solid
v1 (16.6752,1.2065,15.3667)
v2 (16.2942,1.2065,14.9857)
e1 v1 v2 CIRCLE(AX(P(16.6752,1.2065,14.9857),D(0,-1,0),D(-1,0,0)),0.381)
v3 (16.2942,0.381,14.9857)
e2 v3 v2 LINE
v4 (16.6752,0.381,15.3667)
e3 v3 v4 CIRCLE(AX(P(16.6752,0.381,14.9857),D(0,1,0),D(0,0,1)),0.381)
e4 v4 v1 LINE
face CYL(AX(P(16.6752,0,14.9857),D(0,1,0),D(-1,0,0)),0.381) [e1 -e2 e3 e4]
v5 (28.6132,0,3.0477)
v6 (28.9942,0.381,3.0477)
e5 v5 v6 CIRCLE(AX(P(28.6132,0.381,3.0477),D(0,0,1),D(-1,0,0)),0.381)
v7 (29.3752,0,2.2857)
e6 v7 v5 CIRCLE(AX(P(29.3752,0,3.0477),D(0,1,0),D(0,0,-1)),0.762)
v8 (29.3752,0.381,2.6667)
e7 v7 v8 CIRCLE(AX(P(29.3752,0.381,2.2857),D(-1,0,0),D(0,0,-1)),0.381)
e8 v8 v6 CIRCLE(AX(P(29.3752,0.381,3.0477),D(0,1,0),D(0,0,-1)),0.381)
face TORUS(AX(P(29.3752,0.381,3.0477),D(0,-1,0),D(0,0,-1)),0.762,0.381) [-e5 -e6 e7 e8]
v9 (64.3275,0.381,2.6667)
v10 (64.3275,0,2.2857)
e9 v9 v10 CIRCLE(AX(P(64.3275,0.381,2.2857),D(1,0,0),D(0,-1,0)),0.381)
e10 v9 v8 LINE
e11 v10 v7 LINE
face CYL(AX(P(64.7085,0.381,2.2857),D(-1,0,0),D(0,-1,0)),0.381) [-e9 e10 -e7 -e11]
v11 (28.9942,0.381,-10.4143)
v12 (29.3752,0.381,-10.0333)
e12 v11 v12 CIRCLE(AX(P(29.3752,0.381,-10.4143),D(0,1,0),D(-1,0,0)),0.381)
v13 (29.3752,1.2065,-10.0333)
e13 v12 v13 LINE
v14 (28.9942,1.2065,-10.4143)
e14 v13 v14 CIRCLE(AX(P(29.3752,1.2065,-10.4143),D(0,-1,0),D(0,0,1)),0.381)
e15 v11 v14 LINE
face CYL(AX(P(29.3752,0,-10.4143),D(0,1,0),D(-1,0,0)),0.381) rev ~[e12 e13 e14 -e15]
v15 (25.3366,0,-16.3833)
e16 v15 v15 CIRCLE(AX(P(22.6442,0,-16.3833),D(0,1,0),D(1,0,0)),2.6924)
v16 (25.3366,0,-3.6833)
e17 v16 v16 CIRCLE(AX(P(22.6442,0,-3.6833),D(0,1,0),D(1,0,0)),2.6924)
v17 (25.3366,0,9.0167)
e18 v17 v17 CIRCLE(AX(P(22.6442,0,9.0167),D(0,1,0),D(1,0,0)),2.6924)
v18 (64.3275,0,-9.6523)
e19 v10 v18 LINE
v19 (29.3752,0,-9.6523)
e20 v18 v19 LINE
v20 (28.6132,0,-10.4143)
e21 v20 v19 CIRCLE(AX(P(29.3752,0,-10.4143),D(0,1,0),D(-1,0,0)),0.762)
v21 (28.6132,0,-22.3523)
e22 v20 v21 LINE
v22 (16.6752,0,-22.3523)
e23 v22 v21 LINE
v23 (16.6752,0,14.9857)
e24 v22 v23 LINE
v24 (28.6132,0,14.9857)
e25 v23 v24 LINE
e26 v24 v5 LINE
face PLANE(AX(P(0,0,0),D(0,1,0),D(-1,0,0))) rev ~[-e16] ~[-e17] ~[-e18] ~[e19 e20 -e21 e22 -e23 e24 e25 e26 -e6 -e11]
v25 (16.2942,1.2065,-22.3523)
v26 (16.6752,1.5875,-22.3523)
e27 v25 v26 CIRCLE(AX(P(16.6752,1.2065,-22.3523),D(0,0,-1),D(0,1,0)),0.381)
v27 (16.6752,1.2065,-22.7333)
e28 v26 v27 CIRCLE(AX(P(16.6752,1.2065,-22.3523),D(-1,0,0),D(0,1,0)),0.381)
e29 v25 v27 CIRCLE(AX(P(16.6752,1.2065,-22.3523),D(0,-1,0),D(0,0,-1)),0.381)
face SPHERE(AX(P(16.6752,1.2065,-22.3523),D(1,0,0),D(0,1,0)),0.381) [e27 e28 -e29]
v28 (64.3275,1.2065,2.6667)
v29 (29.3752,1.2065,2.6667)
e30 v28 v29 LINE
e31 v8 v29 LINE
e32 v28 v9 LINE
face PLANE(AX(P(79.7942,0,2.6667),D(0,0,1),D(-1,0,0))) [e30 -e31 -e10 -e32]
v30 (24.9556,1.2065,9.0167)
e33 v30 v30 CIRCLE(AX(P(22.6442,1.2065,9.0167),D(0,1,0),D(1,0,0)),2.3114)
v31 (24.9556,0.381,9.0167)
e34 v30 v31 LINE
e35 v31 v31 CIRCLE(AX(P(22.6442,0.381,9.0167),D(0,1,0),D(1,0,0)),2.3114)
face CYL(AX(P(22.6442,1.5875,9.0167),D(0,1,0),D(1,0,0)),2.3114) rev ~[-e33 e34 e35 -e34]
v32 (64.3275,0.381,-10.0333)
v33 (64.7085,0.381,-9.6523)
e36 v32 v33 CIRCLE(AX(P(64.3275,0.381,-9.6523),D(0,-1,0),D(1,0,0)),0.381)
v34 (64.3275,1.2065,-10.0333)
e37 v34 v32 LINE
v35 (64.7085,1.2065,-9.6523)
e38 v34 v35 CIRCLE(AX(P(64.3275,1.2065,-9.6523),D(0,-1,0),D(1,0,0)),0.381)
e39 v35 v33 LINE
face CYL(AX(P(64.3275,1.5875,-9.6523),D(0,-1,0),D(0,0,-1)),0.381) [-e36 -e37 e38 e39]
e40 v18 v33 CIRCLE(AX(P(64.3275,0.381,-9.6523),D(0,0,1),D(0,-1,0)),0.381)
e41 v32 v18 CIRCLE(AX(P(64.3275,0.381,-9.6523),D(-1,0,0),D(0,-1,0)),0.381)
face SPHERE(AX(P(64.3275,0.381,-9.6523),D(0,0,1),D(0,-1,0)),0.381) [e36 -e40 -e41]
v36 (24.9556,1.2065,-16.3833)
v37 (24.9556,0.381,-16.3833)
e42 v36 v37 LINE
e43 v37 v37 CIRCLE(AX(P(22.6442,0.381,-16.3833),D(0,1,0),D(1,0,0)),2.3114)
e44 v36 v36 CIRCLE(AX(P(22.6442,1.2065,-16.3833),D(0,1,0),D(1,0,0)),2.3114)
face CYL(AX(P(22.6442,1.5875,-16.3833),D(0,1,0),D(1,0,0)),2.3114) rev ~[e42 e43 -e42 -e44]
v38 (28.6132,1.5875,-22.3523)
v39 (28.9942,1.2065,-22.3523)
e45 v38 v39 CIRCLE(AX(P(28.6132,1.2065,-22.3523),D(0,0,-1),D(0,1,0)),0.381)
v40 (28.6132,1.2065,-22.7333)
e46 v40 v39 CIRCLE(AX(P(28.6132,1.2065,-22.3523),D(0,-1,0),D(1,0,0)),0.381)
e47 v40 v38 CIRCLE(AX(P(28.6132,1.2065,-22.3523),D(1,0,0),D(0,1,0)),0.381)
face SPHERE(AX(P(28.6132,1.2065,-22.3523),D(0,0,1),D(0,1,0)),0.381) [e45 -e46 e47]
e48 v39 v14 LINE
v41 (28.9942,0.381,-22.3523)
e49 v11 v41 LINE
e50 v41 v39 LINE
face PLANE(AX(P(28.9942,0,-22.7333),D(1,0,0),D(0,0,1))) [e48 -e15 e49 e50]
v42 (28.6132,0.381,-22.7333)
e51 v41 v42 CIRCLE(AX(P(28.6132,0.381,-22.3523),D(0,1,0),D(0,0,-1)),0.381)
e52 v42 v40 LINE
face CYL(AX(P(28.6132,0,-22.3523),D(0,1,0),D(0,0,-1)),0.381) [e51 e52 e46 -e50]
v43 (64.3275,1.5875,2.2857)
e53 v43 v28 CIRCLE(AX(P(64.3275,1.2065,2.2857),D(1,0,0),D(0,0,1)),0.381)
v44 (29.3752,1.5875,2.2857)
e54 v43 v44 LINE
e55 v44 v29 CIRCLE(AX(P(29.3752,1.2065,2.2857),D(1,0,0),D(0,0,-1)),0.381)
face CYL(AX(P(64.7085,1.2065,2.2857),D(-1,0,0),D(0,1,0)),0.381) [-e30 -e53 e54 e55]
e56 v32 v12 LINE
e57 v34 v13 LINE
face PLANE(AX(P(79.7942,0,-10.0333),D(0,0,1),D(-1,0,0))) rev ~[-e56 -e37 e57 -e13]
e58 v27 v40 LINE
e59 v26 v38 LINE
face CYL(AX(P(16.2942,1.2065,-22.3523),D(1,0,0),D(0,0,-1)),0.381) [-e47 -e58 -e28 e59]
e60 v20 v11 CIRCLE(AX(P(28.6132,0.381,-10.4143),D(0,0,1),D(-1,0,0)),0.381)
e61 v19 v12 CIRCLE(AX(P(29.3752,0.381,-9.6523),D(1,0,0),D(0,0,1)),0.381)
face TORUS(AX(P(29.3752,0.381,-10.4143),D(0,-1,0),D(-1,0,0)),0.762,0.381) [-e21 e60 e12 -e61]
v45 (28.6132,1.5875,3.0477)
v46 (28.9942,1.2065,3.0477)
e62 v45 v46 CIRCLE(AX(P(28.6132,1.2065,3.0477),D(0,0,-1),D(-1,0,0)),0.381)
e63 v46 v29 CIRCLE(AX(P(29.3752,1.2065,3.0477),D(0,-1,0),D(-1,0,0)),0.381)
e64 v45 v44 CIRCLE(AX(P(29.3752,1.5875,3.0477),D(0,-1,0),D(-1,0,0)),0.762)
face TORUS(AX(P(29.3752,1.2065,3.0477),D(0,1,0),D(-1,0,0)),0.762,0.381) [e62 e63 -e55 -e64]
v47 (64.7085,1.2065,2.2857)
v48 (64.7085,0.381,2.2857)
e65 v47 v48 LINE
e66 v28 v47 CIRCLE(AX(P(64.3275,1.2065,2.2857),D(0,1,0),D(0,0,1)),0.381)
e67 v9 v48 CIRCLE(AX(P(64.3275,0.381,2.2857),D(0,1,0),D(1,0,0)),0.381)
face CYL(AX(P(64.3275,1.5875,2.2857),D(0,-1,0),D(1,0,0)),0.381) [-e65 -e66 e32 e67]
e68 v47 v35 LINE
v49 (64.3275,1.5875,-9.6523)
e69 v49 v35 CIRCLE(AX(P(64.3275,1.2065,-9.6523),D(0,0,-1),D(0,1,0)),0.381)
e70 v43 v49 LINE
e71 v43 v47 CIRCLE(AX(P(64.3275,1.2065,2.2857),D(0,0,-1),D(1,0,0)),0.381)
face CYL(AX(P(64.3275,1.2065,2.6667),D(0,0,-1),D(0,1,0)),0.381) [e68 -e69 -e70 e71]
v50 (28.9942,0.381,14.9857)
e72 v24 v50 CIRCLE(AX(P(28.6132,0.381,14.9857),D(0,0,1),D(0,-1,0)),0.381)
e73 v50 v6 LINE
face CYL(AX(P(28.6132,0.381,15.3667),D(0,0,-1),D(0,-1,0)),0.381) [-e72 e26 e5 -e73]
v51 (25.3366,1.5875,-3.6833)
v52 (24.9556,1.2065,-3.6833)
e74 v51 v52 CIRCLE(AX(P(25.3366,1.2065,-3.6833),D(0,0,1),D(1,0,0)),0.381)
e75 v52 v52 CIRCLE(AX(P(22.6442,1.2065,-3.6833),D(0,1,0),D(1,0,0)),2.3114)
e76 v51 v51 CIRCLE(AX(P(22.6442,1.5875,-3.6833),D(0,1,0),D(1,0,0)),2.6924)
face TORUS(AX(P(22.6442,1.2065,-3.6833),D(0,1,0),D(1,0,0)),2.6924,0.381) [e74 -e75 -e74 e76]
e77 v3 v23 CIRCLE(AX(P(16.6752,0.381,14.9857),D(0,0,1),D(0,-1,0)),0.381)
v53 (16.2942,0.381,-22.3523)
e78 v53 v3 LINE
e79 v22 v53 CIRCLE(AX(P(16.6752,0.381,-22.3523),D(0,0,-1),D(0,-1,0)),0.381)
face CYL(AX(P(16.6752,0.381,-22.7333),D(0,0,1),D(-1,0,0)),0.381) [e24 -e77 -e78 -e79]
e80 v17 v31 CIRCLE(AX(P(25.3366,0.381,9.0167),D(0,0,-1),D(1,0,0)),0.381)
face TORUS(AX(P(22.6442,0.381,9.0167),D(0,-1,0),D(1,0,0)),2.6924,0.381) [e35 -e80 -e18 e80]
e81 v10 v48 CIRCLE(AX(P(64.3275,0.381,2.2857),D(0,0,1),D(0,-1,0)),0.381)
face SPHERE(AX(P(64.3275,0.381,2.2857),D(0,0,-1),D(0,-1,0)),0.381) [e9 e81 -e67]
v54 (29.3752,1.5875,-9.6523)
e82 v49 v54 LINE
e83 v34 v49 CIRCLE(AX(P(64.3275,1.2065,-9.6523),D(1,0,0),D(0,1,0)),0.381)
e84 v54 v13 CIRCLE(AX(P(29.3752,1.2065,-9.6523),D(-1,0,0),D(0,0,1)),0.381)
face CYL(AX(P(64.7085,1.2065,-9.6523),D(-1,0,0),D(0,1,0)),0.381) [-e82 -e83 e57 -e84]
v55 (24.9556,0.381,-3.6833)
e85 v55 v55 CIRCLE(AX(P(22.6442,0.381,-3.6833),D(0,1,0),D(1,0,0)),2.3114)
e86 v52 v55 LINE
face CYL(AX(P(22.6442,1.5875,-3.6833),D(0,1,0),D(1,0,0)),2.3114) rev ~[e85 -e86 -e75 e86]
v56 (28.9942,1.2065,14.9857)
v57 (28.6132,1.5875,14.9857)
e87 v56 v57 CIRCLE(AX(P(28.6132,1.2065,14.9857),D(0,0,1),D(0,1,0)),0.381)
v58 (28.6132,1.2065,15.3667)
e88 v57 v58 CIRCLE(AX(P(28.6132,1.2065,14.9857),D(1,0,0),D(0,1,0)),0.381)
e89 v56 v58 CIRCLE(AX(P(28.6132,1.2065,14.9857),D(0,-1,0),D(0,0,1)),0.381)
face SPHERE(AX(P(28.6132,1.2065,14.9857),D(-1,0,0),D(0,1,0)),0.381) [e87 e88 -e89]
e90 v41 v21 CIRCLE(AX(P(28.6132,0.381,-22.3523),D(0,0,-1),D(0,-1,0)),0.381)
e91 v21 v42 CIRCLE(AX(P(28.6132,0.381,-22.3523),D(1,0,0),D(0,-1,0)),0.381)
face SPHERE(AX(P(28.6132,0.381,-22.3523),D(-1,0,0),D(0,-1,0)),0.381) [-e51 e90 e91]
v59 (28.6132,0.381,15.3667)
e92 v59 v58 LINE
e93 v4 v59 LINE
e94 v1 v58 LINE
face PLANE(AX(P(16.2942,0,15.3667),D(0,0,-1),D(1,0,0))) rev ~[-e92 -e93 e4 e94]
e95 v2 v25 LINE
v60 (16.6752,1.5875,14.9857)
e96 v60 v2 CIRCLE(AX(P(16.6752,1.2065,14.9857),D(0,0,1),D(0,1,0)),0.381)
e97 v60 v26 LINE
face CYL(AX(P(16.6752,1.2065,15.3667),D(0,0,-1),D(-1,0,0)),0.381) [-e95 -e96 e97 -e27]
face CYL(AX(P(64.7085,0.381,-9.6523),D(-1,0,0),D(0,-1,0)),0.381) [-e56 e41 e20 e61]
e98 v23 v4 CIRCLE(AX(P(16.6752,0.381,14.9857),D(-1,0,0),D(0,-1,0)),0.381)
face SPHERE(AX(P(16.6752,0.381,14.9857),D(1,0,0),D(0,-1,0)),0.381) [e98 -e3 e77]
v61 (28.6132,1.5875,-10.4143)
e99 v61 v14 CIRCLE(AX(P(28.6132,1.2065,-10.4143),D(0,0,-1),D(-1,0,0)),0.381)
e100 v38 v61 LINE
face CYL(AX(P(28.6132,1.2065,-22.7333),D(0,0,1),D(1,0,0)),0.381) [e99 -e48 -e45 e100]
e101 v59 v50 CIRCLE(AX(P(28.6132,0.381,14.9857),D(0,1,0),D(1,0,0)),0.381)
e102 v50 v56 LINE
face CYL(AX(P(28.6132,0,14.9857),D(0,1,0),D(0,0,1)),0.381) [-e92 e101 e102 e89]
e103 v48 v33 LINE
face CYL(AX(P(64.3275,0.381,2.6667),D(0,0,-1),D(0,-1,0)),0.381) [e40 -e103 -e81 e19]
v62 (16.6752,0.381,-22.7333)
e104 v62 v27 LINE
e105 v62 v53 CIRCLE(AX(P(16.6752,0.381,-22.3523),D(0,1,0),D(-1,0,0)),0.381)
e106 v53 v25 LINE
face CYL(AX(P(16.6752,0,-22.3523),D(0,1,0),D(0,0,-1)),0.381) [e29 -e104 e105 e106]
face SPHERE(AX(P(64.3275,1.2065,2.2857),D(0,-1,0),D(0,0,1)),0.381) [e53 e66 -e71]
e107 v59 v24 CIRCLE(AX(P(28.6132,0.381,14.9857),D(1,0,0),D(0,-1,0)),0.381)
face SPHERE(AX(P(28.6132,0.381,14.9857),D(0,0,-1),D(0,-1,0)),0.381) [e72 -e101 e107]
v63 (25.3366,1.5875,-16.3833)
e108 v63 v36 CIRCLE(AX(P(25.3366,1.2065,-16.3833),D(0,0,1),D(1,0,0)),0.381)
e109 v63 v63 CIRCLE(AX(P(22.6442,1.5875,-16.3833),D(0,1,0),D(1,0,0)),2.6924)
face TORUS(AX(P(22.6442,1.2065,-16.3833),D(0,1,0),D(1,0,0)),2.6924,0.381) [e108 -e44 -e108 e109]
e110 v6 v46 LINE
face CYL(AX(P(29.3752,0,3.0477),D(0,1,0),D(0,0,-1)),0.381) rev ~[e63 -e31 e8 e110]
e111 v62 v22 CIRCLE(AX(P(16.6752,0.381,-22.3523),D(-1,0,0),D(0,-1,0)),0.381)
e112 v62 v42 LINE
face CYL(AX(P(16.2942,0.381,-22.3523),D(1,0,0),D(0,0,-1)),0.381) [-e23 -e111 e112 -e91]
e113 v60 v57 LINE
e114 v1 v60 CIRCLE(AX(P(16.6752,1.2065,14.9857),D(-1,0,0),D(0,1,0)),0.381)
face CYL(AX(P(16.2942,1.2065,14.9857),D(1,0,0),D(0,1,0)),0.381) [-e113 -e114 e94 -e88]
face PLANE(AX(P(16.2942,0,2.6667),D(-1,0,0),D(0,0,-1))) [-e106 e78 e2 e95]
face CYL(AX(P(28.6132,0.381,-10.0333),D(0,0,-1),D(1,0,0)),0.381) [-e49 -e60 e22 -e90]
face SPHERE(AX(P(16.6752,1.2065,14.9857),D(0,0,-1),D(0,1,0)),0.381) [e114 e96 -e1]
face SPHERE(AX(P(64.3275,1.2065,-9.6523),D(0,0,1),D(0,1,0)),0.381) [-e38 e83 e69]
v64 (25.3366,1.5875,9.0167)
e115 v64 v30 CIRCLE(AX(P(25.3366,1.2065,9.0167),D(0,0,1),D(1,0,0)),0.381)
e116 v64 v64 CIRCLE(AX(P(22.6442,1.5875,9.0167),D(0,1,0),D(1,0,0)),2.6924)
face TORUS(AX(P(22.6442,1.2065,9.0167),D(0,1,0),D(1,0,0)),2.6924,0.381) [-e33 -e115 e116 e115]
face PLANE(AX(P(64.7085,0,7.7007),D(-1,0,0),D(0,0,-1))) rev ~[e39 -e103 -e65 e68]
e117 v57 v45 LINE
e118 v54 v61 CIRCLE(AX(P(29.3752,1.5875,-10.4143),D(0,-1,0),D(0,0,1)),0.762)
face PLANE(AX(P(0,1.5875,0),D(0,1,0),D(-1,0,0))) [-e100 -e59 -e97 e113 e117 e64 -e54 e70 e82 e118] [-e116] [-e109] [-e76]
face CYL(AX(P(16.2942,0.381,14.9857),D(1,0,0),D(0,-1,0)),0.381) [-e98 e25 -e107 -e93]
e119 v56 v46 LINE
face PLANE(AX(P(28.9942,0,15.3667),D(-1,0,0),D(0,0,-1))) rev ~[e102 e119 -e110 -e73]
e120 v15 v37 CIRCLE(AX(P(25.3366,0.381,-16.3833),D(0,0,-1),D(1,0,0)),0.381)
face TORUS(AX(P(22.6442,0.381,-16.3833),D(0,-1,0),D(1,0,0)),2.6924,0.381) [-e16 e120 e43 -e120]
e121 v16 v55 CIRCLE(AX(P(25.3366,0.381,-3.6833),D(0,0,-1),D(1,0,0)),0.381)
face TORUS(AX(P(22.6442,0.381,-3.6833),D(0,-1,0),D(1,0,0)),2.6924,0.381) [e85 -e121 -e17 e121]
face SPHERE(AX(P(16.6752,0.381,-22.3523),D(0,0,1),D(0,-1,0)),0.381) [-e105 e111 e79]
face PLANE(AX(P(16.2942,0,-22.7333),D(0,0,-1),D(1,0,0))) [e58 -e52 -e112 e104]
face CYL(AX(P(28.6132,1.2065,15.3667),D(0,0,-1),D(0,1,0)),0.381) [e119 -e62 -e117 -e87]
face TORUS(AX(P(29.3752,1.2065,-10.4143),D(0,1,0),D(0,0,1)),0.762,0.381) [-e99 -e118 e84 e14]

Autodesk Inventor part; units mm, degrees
ref_plane "YZ Plane" through (0, 0, 0) normal (1, 0, 0) x (0, 1, 0)
ref_plane "XZ Plane" through (0, 0, 0) normal (0, 1, 0) x (-1, 0, 0)
ref_plane "XY Plane" through (0, 0, 0) normal (0, 0, 1) x (1, 0, 0)
sketch "Sketch1" plane through (0, 0, 0) normal (0, 1, 0) x (-1, 0, 0)
  line L0 (-16.2942, -22.7333) -> (-28.9942, -22.7333)
  line L1 (-28.9942, 2.6667) -> (-16.2942, 2.6667)
  line L2 (-16.2942, 2.6667) -> (-16.2942, -22.7333)
  line L3 (-16.2942, -22.7333) -> (-28.9942, 2.6667) construction
  line L4 (-28.9942, -22.7333) -> (-16.2942, 2.6667) construction
  line L5 (-79.7942, -15.1133) -> (-79.7942, 2.6667)
  line L6 (-79.7942, -15.1133) -> (-28.9942, -15.1133)
  line L7 (-79.7942, 2.6667) -> (-28.9942, 2.6667)
  line L8 (-28.9942, -22.7333) -> (-28.9942, -15.1133)
  line L9 (-28.9942, 2.6667) -> (-28.9942, 2.6667)
  line L10 (-28.9942, 2.6667) -> (-16.2942, 2.6667)
  line L11 (-16.2942, 2.6667) -> (-16.2942, 15.3667)
  line L12 (-16.2942, 15.3667) -> (-28.9942, 15.3667)
  line L13 (-28.9942, 15.3667) -> (-28.9942, 2.6667)
  point P0 (-22.6442, -10.0333)
  dimension "d2" = 12.7
  dimension "d4" = 17.78
  dimension "d6" = 50.8
  dimension "d7" = 26.565
  dimension "d19" = 12.7
extrude "Extrusion1" add sketch "Sketch1" along normal blind 1.5875
sketch "Sketch2" plane through (0, 1.5875, 0) normal (0, 1, 0) x (1, 0, 0)
  line L0 (28.9942, -2.6667) -> (16.2942, -2.6667)
  line L1 (16.2942, -2.6667) -> (16.2942, 22.7333)
  line L2 (16.2942, 22.7333) -> (28.9942, 22.7333)
  line L3 (28.9942, 22.7333) -> (28.9942, -2.6667)
  line L4 (28.9942, -2.6667) -> (16.2942, 22.7333) construction
  line L5 (16.2942, -2.6667) -> (28.9942, 22.7333) construction
  line L6 (22.6442, -2.6667) -> (22.6442, 22.7333) construction
  circle A0 centre (22.6442, 16.3833) radius 2.3114
  circle A1 centre (22.6442, 3.6833) radius 2.3114
  circle A2 centre (22.6442, -9.0167) radius 2.3114
  point P0 (16.2942, -2.6667)
  point P1 (0, 0)
  point P2 (22.6442, 10.0333)
  dimension "d11" = 6.35
  dimension "d12" = 4.6228
  dimension "d22" = 12.7
extrude "Extrusion2" cut sketch "Sketch2" against normal blind 1.5875 contours A0 | A1 | A2
sketch "Sketch3" plane through (0, 0, 0) normal (0, -1, 0) x (1, 0, 0)
  line L0 (79.7942, -15.1133) -> (28.9942, -15.1133) projected
  line L1 (79.7942, 2.6667) -> (79.7942, -15.1133) projected
  line L2 (28.9942, -15.1133) -> (79.7942, -15.1133)
  line L3 (79.7942, -15.1133) -> (79.7942, -10.0333)
  line L4 (79.7942, -10.0333) -> (28.9942, -10.0333)
  line L5 (28.9942, -10.0333) -> (28.9942, -15.1133)
  point P0 (0, 0)
  dimension "d27" = 5.08
extrude "Extrusion3" cut sketch "Sketch3" against normal blind 1.5875
sketch "Sketch4" plane through (0, 0, 0) normal (0, -1, 0) x (1, 0, 0)
  line L0 (83.7791, 7.7007) -> (64.7085, 7.7007)
  line L1 (64.7085, 7.7007) -> (64.7085, -14.0719)
  line L2 (64.7085, -14.0719) -> (83.7791, -14.0719)
  line L3 (83.7791, -14.0719) -> (83.7791, 7.7007)
  point P0 (0, 0)
extrude "Extrusion4" cut sketch "Sketch4" against normal blind 1.5875
fillet "Fillet2" radius 0.381 30 edges at (64.7085, 0, -3.6833) (46.8514, 0, 2.6667) (28.9942, 0, 9.0167) (22.6442, 0, 15.3667) (16.2942, 0, -3.6833) (22.6442, 0, -22.7333) (28.9942, 0, -16.3833) (46.8514, 0, -10.0333) (64.7085, 0.7937, 2.6667) (46.8514, 1.5875, 2.6667) (28.9942, 0.7937, 2.6667) (64.7085, 1.5875, -3.6833) (46.8514, 1.5875, -10.0333) (28.9942, 1.5875, -16.3833) (22.6442, 1.5875, -22.7333) (16.2942, 1.5875, -3.6833) (22.6442, 1.5875, 15.3667) (28.9942, 1.5875, 9.0167) (64.7085, 0.7937, -10.0333) (28.9942, 0.7937, -10.0333) (20.3328, 1.5875, -16.3833) (20.3328, 0, -16.3833) (16.2942, 0.7937, -22.7333) (28.9942, 0.7937, -22.7333) (16.2942, 0.7937, 15.3667) (20.3328, 1.5875, -3.6833) (20.3328, 0, -3.6833) (20.3328, 1.5875, 9.0167) (20.3328, 0, 9.0167) (28.9942, 0.7937, 15.3667)
properties part number "pto finger"
